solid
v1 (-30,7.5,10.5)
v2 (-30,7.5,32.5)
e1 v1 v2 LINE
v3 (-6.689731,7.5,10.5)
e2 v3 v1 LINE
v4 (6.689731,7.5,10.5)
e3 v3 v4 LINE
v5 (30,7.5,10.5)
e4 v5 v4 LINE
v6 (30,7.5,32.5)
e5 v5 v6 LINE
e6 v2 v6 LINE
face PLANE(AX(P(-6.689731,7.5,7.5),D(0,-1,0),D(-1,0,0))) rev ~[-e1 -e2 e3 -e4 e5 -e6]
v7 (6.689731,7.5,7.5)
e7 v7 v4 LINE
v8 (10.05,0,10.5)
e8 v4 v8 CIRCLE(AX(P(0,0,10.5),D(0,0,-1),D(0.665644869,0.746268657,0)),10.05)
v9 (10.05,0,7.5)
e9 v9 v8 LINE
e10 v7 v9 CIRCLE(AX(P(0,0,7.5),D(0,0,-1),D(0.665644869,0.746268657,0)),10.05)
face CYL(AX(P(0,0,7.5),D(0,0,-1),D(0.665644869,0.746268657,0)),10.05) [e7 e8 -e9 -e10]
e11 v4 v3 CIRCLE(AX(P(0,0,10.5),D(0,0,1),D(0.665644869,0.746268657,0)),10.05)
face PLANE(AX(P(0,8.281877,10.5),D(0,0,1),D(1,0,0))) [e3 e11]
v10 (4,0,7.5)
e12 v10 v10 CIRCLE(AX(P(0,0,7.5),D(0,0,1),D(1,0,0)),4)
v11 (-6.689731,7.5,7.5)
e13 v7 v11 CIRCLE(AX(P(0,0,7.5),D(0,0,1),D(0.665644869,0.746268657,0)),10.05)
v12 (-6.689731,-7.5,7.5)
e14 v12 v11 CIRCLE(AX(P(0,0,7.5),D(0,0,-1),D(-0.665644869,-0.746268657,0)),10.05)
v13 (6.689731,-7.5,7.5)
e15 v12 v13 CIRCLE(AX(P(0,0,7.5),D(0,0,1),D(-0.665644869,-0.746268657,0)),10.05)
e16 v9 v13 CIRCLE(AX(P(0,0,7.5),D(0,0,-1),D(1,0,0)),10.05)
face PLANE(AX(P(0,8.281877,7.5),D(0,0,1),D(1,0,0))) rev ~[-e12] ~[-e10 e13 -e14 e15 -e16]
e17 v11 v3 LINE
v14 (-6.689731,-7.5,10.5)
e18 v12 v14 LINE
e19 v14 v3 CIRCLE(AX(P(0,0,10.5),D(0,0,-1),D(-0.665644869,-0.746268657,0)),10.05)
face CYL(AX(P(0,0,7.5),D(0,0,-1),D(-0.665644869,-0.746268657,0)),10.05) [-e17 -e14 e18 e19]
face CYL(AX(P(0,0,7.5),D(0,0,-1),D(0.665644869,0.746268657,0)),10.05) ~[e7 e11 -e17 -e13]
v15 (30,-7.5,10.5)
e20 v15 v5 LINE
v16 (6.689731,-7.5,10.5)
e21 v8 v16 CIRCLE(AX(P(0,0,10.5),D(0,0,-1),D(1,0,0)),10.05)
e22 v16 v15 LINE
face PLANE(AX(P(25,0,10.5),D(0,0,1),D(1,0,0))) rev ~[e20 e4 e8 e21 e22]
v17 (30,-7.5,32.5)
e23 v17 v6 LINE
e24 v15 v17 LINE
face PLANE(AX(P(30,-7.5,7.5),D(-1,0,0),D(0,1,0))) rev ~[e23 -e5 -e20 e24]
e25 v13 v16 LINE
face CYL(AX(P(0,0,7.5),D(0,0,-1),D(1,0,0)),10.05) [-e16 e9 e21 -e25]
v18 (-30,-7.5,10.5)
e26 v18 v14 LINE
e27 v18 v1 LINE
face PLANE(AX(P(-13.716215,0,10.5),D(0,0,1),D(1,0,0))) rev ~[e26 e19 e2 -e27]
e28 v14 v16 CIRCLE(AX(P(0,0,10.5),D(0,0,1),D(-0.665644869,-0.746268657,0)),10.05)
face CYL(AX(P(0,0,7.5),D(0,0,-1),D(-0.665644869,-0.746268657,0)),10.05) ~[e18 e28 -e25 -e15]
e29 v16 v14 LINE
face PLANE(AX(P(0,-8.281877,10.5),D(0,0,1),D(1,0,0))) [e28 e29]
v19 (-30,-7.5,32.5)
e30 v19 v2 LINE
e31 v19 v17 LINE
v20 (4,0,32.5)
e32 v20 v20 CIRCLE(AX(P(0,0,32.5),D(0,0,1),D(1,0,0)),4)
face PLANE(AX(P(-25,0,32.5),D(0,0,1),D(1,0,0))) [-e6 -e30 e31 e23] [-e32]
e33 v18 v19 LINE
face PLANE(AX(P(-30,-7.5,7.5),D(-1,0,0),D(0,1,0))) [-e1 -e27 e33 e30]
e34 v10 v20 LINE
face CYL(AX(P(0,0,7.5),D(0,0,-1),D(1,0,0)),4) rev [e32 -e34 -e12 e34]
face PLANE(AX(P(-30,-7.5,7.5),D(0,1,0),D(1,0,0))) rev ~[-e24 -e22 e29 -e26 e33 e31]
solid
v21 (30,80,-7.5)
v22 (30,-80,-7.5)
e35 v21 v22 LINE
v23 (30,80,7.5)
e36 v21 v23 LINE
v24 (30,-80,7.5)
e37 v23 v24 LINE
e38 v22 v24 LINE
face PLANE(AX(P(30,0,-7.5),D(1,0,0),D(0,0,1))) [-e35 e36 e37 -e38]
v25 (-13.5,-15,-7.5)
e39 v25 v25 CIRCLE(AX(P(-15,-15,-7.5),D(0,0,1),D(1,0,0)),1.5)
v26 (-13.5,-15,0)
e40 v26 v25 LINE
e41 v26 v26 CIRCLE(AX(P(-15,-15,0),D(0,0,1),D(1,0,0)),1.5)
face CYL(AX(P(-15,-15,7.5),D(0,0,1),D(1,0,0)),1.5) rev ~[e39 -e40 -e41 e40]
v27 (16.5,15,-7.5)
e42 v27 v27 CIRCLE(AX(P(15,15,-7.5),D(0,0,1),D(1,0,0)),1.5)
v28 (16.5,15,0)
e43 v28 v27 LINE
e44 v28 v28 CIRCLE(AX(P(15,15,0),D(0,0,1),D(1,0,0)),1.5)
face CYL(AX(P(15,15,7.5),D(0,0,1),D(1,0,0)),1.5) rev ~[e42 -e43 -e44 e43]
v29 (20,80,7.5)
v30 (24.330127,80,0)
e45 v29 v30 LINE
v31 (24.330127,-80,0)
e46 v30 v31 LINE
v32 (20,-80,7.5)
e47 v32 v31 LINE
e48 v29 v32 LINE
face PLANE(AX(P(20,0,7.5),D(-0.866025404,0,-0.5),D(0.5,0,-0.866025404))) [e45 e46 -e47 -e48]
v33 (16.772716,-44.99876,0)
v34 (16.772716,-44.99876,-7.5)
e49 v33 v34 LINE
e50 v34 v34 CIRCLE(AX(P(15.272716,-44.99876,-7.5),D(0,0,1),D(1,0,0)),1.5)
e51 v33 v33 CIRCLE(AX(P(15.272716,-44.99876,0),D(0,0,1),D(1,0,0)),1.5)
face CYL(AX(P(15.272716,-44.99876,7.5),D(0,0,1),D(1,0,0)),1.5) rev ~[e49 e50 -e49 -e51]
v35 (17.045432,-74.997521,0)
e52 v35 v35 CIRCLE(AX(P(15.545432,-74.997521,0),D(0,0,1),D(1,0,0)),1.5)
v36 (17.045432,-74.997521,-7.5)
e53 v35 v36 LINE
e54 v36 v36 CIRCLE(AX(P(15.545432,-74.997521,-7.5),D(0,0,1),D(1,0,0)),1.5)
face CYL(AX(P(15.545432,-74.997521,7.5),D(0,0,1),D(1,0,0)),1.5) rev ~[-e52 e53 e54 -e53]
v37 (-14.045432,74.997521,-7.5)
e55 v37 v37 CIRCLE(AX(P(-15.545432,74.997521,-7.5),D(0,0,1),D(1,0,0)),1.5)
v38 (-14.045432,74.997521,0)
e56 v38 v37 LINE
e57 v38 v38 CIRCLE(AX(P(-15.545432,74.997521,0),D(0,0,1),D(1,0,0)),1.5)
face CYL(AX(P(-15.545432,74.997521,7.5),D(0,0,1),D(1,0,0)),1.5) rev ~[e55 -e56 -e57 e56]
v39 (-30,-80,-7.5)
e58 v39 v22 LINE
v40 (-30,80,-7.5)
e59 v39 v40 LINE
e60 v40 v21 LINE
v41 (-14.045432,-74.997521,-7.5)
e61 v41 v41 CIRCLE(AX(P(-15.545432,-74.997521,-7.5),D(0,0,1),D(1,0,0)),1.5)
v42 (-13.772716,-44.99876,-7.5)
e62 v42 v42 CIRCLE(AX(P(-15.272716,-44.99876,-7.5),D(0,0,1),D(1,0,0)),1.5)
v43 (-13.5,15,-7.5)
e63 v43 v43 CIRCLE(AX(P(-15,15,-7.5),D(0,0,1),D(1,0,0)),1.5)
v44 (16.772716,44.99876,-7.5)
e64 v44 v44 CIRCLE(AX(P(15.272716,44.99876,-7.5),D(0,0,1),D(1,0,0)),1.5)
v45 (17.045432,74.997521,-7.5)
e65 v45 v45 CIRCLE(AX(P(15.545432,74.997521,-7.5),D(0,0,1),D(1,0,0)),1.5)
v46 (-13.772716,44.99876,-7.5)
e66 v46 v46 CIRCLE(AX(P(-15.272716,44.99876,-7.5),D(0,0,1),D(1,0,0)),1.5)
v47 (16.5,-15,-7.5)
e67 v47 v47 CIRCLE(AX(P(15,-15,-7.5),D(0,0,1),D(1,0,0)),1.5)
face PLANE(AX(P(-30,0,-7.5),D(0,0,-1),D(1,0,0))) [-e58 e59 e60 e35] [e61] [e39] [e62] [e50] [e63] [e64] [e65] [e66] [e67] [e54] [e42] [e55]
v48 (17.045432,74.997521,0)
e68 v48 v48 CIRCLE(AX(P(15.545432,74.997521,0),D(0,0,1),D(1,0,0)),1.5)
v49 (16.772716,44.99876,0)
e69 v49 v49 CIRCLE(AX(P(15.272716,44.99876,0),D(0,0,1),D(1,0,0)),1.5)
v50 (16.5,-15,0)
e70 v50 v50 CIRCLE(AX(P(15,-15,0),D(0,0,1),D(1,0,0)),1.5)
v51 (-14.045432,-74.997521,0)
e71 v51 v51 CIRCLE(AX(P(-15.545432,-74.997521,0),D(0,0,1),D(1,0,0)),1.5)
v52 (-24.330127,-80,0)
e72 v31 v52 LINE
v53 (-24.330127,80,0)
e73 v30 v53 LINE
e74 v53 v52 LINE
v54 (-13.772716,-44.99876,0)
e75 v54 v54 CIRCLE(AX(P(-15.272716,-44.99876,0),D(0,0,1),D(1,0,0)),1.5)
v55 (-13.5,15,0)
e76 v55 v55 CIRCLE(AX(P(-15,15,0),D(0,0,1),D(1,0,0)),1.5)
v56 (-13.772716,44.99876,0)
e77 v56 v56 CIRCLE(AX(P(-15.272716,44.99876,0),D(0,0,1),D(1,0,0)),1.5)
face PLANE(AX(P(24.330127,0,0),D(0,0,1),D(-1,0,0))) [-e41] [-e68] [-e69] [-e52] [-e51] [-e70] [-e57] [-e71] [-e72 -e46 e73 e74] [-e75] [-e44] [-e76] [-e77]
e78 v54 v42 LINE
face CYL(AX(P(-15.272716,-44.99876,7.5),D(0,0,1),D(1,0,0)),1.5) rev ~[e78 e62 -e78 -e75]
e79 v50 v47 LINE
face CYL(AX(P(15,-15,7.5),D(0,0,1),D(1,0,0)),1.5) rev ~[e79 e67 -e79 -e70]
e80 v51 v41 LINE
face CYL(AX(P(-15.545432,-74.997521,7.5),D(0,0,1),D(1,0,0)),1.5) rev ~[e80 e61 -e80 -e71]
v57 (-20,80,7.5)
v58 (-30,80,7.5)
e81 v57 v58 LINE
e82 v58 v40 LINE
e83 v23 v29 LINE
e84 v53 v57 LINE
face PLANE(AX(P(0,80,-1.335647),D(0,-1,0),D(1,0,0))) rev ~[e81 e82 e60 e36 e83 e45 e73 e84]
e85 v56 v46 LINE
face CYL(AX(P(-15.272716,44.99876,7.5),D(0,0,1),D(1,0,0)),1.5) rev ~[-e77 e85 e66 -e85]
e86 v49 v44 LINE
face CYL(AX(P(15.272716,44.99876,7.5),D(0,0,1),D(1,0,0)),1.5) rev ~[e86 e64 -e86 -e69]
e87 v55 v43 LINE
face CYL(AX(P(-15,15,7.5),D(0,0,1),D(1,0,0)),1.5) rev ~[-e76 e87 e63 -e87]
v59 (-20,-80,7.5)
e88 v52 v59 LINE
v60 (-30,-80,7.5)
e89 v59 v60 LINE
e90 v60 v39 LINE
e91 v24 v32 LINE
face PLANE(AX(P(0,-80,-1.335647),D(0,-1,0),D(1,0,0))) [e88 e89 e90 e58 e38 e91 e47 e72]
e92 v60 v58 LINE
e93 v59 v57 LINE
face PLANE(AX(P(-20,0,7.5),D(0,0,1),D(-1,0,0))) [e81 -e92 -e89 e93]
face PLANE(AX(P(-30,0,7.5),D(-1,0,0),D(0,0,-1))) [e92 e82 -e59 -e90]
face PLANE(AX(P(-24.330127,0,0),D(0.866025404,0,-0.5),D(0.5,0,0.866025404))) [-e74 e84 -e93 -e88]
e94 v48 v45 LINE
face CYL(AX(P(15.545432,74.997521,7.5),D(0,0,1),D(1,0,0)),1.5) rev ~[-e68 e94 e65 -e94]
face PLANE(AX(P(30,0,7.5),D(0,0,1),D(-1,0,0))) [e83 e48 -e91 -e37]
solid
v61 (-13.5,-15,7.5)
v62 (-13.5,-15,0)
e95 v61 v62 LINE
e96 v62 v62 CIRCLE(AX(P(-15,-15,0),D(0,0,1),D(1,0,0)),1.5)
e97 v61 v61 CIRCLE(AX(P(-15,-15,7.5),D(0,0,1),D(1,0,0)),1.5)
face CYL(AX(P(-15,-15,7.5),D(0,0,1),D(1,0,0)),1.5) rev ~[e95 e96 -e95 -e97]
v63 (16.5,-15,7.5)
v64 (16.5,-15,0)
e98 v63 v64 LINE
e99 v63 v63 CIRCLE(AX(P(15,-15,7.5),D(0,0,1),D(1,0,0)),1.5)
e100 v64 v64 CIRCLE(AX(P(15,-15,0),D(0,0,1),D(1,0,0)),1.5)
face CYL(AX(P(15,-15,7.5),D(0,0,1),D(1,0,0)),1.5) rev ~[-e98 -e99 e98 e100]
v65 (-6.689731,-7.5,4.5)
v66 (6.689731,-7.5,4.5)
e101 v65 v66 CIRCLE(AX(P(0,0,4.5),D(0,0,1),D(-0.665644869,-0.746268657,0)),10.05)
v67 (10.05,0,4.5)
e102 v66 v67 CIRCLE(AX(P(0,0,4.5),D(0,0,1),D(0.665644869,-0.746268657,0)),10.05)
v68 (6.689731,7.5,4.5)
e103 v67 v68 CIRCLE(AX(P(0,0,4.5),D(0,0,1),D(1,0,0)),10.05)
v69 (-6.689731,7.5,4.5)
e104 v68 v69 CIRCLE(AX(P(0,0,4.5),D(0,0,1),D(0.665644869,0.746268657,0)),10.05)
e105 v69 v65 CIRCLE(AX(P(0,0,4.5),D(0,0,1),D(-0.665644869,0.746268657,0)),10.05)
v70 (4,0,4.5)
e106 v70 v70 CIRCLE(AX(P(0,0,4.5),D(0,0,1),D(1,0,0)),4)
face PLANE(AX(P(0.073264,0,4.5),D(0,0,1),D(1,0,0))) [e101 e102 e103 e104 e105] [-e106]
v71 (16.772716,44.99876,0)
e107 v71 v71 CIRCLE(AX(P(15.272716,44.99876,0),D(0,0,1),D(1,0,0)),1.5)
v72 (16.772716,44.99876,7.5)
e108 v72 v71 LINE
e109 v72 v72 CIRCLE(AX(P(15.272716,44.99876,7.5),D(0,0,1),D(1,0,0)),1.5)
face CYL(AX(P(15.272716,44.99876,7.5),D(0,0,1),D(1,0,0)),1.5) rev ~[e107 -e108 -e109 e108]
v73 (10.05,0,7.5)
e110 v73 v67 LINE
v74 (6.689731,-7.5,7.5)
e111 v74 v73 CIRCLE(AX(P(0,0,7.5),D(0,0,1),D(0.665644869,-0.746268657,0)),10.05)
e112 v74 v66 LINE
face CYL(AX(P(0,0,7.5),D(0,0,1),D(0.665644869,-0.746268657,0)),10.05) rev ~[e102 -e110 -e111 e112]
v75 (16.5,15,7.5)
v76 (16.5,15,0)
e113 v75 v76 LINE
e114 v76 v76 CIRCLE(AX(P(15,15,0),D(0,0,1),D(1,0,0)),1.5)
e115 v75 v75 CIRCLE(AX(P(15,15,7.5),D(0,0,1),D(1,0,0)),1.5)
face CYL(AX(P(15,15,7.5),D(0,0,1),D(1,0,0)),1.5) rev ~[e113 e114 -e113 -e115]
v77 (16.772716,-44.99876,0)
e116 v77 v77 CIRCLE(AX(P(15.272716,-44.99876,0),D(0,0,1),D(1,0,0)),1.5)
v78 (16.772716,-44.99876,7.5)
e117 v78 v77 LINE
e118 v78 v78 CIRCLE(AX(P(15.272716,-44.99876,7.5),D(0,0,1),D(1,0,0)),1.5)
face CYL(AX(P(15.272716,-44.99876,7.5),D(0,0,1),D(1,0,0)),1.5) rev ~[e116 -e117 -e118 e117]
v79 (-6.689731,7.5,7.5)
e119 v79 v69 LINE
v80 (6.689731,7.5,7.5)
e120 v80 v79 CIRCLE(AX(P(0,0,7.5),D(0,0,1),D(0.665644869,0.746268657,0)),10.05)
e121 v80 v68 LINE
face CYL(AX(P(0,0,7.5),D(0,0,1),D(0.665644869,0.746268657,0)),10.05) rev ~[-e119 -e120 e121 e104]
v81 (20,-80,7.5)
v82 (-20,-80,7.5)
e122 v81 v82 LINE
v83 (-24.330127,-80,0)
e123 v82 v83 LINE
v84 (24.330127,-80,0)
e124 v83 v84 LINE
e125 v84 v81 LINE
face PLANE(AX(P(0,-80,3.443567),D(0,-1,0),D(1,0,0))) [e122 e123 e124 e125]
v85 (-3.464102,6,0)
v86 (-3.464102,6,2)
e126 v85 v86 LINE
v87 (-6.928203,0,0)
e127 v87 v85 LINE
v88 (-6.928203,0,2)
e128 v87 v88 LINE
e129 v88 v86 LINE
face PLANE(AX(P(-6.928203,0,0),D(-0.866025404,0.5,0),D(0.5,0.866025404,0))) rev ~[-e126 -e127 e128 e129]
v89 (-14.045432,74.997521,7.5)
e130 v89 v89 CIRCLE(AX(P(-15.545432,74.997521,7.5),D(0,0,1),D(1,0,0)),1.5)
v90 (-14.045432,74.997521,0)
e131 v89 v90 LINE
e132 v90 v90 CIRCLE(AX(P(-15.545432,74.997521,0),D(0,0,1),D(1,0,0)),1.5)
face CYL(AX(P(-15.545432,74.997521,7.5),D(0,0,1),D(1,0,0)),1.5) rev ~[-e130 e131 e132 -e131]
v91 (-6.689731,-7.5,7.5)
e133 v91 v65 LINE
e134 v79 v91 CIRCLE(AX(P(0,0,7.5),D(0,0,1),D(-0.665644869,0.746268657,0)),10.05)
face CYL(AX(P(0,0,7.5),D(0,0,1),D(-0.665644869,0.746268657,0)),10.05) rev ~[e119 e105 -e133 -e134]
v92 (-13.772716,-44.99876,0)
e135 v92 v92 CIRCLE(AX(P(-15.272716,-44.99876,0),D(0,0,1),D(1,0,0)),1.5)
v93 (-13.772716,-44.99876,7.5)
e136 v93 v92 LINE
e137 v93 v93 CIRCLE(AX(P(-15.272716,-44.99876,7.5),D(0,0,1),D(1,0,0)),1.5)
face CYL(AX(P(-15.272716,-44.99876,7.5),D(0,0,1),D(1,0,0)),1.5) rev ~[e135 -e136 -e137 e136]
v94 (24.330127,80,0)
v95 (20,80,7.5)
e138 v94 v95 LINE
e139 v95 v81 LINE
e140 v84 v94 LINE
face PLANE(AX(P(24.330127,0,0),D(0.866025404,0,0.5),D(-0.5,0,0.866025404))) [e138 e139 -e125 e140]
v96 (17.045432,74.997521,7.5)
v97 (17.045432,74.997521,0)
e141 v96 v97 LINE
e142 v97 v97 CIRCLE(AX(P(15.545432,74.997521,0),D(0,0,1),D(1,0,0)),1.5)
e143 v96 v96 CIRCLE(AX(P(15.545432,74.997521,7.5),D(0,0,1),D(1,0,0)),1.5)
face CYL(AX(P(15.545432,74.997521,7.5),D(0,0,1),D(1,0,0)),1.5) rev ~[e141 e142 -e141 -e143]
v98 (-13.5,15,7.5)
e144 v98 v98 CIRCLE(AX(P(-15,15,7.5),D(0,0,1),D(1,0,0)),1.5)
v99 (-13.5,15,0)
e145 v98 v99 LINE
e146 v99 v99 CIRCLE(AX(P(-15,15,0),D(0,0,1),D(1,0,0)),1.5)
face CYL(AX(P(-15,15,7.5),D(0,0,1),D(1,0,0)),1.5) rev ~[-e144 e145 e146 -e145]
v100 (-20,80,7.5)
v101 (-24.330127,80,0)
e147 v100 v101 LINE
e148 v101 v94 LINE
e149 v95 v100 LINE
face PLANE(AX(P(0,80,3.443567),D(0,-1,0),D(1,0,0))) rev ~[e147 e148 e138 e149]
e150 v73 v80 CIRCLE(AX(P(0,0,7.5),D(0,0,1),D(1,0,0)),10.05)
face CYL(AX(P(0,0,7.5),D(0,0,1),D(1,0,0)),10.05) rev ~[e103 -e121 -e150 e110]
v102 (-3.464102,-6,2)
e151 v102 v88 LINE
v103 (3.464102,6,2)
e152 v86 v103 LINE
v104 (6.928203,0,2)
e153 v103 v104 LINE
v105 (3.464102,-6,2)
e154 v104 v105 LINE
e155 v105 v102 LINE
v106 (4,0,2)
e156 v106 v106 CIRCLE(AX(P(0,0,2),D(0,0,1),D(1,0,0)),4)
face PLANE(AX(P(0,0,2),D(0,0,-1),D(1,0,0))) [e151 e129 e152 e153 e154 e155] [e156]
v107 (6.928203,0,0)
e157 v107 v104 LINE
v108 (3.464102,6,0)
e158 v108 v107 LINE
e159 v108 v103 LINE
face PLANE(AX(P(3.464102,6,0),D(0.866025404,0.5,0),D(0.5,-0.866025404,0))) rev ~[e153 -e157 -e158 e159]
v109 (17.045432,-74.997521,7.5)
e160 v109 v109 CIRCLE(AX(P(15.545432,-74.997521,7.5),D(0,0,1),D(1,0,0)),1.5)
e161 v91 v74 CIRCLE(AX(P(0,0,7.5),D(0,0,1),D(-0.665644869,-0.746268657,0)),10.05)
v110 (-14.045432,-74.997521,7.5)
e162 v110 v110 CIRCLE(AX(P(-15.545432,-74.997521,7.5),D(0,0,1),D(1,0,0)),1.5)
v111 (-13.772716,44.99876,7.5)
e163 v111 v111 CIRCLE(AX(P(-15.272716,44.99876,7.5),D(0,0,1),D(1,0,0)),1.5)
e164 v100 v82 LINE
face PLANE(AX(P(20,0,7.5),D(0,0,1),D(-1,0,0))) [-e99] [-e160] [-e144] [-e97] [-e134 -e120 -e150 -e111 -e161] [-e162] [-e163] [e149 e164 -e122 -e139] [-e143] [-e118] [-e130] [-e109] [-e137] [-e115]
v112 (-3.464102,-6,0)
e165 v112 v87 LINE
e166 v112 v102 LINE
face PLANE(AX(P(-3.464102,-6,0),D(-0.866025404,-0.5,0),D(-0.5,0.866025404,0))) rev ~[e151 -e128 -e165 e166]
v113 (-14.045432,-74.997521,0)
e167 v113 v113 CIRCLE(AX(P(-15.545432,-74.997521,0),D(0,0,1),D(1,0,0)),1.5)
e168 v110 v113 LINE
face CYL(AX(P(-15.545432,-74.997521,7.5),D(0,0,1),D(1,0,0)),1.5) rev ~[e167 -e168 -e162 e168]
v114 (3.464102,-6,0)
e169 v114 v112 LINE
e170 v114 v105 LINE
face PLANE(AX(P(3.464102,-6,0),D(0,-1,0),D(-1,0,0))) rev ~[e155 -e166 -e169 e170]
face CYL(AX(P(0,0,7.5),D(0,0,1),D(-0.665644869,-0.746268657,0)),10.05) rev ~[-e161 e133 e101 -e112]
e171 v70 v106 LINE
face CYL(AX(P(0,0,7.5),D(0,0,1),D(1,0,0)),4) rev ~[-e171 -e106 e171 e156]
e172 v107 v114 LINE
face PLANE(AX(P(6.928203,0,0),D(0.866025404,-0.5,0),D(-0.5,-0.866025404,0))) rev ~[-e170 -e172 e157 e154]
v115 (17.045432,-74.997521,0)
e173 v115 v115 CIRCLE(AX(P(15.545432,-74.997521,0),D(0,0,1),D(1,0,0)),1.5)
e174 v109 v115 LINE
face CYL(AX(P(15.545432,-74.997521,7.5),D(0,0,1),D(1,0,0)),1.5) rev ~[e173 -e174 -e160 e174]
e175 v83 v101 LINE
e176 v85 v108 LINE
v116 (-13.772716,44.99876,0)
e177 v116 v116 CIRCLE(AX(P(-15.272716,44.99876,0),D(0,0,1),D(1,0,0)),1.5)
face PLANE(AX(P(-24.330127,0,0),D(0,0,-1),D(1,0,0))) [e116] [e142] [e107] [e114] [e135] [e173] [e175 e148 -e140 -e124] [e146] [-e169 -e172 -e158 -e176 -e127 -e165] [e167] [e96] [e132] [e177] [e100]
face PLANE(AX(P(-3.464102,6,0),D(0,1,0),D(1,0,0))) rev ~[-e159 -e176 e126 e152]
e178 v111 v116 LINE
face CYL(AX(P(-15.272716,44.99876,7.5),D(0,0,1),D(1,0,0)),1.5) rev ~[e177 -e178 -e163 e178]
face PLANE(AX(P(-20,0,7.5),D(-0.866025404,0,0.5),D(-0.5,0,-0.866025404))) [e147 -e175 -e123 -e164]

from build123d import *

# Parameters (mm, degrees)
F2_DEPTH      = 80
F2_DEPTH_BACK = 80
F3_DEPTH      = 80
F3_DEPTH_BACK = 80
F4_R          = 4
F5_DEPTH      = 3
F4_W          = 10
F4_H          = 15
F6_DEPTH      = 25
F7_DEPTH      = 3
F8_DEPTH      = 25.001
F8_DEPTH_BACK = 15.001
F9_DEPTH      = 3
F11_DEPTH     = 2
F12_DEPTH     = 15.001
F4_R_2        = 1.5
F13_DEPTH     = 15.001


with BuildPart() as f2:
    # F1 (on Front) → F2 (new body, two sides)
    with BuildSketch(Plane.XZ) as f2_sk:
        Polygon((-30, -7.5), (30, -7.5), (30, 7.5), (20, 7.5), (24.3301270189, 0), (0, 0), (-24.3301270189, 0), (-20, 7.5), (-30, 7.5), align=None)
    extrude(amount=F2_DEPTH)
    extrude(f2_sk.sketch, amount=-F2_DEPTH_BACK)


with BuildPart() as f3:
    # F1 (on Front) → F3 (new body, two sides)
    with BuildSketch(Plane.XZ) as f3_sk:
        Polygon((24.3301270189, 0), (20, 7.5), (-20, 7.5), (-24.3301270189, 0), (0, 0), align=None)
    extrude(amount=F3_DEPTH)
    extrude(f3_sk.sketch, amount=-F3_DEPTH_BACK)

    # F4 (on face) → F5 (cut)
    with BuildSketch(Plane.XY.offset(7.5)):
        with BuildLine():
            ThreePointArc((6.6897309363, -7.5), (9.1715401081, -4.1091789989), (10.05, 0))
            ThreePointArc((10.05, 0), (9.1715401081, 4.1091789989), (6.6897309363, 7.5))
            Line((6.6897309363, 7.5), (-6.6897309363, 7.5))
            ThreePointArc((-6.6897309363, 7.5), (-10.05, 0), (-6.6897309363, -7.5))
            Line((-6.6897309363, -7.5), (6.6897309363, -7.5))
        make_face()
        Circle(F4_R, mode=Mode.SUBTRACT)
        with BuildLine():
            Line((-6.6897309363, 7.5), (6.6897309363, 7.5))
            ThreePointArc((6.6897309363, 7.5), (0, 10.05), (-6.6897309363, 7.5))
        make_face()
        with BuildLine():
            ThreePointArc((-6.6897309363, -7.5), (0, -10.05), (6.6897309363, -7.5))
            Line((6.6897309363, -7.5), (-6.6897309363, -7.5))
        make_face()
    extrude(amount=-F5_DEPTH, mode=Mode.SUBTRACT)

    # F10 (on face) → F11 (cut)
    with BuildSketch(Plane(origin=(0, 0, 0), x_dir=(1, 0, 0), z_dir=(0, 0, -1))):
        Polygon((6.9282032303, 0), (3.4641016151, 6), (-3.4641016151, 6), (-6.9282032303, 0), (-3.4641016151, -6), (3.4641016151, -6), align=None)
    extrude(amount=-F11_DEPTH, mode=Mode.SUBTRACT)

    # F4 (on face) → F12 (cut, through all)
    with BuildSketch(Plane.XY.offset(7.5)):
        Circle(F4_R)
    extrude(amount=-F12_DEPTH, mode=Mode.SUBTRACT)


with BuildPart() as f6:
    # F4 (on face) → F6 (new body)
    with BuildSketch(Plane.XY.offset(7.5)):
        with Locations((-25, 0)):
            Rectangle(F4_W, F4_H)
        with BuildLine():
            ThreePointArc((-6.6897309363, -7.5), (-10.05, 0), (-6.6897309363, 7.5))
            Line((-6.6897309363, 7.5), (-20, 7.5))
            Line((-20, 7.5), (-20, -7.5))
            Line((-20, -7.5), (-6.6897309363, -7.5))
        make_face()
        with BuildLine():
            Line((-6.6897309363, 7.5), (6.6897309363, 7.5))
            ThreePointArc((6.6897309363, 7.5), (0, 10.05), (-6.6897309363, 7.5))
        make_face()
        with BuildLine():
            ThreePointArc((-6.6897309363, -7.5), (0, -10.05), (6.6897309363, -7.5))
            Line((6.6897309363, -7.5), (-6.6897309363, -7.5))
        make_face()
        with BuildLine():
            ThreePointArc((6.6897309363, 7.5), (9.1715401081, 4.1091789989), (10.05, 0))
            ThreePointArc((10.05, 0), (9.1715401081, -4.1091789989), (6.6897309363, -7.5))
            Line((6.6897309363, -7.5), (20, -7.5))
            Line((20, -7.5), (20, 7.5))
            Line((20, 7.5), (6.6897309363, 7.5))
        make_face()
        with BuildLine():
            ThreePointArc((6.6897309363, -7.5), (9.1715401081, -4.1091789989), (10.05, 0))
            ThreePointArc((10.05, 0), (9.1715401081, 4.1091789989), (6.6897309363, 7.5))
            Line((6.6897309363, 7.5), (-6.6897309363, 7.5))
            ThreePointArc((-6.6897309363, 7.5), (-10.05, 0), (-6.6897309363, -7.5))
            Line((-6.6897309363, -7.5), (6.6897309363, -7.5))
        make_face()
        Circle(F4_R, mode=Mode.SUBTRACT)
        with Locations((25, 0)):
            Rectangle(F4_W, F4_H)
    extrude(amount=F6_DEPTH)

    # F4 (on face) → F7 (cut)
    with BuildSketch(Plane.XY.offset(7.5)):
        with Locations((25, 0)):
            Rectangle(F4_W, F4_H)
        with BuildLine():
            ThreePointArc((6.6897309363, 7.5), (9.1715401081, 4.1091789989), (10.05, 0))
            ThreePointArc((10.05, 0), (9.1715401081, -4.1091789989), (6.6897309363, -7.5))
            Line((6.6897309363, -7.5), (20, -7.5))
            Line((20, -7.5), (20, 7.5))
            Line((20, 7.5), (6.6897309363, 7.5))
        make_face()
        with BuildLine():
            ThreePointArc((-6.6897309363, -7.5), (-10.05, 0), (-6.6897309363, 7.5))
            Line((-6.6897309363, 7.5), (-20, 7.5))
            Line((-20, 7.5), (-20, -7.5))
            Line((-20, -7.5), (-6.6897309363, -7.5))
        make_face()
        with Locations((-25, 0)):
            Rectangle(F4_W, F4_H)
    extrude(amount=F7_DEPTH, mode=Mode.SUBTRACT)

    # F4 (on face) → F8 (cut, two sides)
    with BuildSketch(Plane.XY.offset(7.5)) as f8_sk:
        Circle(F4_R)
        with BuildLine():
            Line((-6.6897309363, 7.5), (6.6897309363, 7.5))
            ThreePointArc((6.6897309363, 7.5), (0, 10.05), (-6.6897309363, 7.5))
        make_face()
        with BuildLine():
            ThreePointArc((-6.6897309363, -7.5), (0, -10.05), (6.6897309363, -7.5))
            Line((6.6897309363, -7.5), (-6.6897309363, -7.5))
        make_face()
    extrude(amount=F8_DEPTH, mode=Mode.SUBTRACT)
    extrude(f8_sk.sketch, amount=-F8_DEPTH_BACK, mode=Mode.SUBTRACT)

    # F4 (on face) → F9 (join)
    with BuildSketch(Plane.XY.offset(7.5)):
        with BuildLine():
            Line((-6.6897309363, 7.5), (6.6897309363, 7.5))
            ThreePointArc((6.6897309363, 7.5), (0, 10.05), (-6.6897309363, 7.5))
        make_face()
        with BuildLine():
            ThreePointArc((-6.6897309363, -7.5), (0, -10.05), (6.6897309363, -7.5))
            Line((6.6897309363, -7.5), (-6.6897309363, -7.5))
        make_face()
    extrude(amount=F9_DEPTH)


with BuildPart() as f13_tool:
    # F4 (on face) → F13 (new body, through all)
    with BuildSketch(Plane.XY.offset(7.5)):
        with Locations((15, 15)):
            Circle(F4_R_2)
        with Locations((15.2727160037, 44.9987604074)):
            Circle(F4_R_2)
        with Locations((-15.2727160037, 44.9987604074)):
            Circle(F4_R_2)
        with Locations((-15, 15)):
            Circle(F4_R_2)
        with Locations((-15, -15)):
            Circle(F4_R_2)
        with Locations((15, -15)):
            Circle(F4_R_2)
        with Locations((15.2727160037, -44.9987604074)):
            Circle(F4_R_2)
        with Locations((-15.2727160037, -44.9987604074)):
            Circle(F4_R_2)
        with Locations((-15.5454320074, -74.9975208148)):
            Circle(F4_R_2)
        with Locations((15.5454320074, -74.9975208148)):
            Circle(F4_R_2)
        with Locations((15.5454320074, 74.9975208148)):
            Circle(F4_R_2)
        with Locations((-15.5454320074, 74.9975208148)):
            Circle(F4_R_2)
    extrude(amount=-F13_DEPTH)


with BuildPart() as f2_1:
    add(f2.part)

    # F13: cut by f13_tool
    add(f13_tool.part, mode=Mode.SUBTRACT)


with BuildPart() as f3_1:
    add(f3.part)

    # F13: cut by f13_tool
    add(f13_tool.part, mode=Mode.SUBTRACT)


solid = Compound([f6.part, f2_1.part, f3_1.part])
